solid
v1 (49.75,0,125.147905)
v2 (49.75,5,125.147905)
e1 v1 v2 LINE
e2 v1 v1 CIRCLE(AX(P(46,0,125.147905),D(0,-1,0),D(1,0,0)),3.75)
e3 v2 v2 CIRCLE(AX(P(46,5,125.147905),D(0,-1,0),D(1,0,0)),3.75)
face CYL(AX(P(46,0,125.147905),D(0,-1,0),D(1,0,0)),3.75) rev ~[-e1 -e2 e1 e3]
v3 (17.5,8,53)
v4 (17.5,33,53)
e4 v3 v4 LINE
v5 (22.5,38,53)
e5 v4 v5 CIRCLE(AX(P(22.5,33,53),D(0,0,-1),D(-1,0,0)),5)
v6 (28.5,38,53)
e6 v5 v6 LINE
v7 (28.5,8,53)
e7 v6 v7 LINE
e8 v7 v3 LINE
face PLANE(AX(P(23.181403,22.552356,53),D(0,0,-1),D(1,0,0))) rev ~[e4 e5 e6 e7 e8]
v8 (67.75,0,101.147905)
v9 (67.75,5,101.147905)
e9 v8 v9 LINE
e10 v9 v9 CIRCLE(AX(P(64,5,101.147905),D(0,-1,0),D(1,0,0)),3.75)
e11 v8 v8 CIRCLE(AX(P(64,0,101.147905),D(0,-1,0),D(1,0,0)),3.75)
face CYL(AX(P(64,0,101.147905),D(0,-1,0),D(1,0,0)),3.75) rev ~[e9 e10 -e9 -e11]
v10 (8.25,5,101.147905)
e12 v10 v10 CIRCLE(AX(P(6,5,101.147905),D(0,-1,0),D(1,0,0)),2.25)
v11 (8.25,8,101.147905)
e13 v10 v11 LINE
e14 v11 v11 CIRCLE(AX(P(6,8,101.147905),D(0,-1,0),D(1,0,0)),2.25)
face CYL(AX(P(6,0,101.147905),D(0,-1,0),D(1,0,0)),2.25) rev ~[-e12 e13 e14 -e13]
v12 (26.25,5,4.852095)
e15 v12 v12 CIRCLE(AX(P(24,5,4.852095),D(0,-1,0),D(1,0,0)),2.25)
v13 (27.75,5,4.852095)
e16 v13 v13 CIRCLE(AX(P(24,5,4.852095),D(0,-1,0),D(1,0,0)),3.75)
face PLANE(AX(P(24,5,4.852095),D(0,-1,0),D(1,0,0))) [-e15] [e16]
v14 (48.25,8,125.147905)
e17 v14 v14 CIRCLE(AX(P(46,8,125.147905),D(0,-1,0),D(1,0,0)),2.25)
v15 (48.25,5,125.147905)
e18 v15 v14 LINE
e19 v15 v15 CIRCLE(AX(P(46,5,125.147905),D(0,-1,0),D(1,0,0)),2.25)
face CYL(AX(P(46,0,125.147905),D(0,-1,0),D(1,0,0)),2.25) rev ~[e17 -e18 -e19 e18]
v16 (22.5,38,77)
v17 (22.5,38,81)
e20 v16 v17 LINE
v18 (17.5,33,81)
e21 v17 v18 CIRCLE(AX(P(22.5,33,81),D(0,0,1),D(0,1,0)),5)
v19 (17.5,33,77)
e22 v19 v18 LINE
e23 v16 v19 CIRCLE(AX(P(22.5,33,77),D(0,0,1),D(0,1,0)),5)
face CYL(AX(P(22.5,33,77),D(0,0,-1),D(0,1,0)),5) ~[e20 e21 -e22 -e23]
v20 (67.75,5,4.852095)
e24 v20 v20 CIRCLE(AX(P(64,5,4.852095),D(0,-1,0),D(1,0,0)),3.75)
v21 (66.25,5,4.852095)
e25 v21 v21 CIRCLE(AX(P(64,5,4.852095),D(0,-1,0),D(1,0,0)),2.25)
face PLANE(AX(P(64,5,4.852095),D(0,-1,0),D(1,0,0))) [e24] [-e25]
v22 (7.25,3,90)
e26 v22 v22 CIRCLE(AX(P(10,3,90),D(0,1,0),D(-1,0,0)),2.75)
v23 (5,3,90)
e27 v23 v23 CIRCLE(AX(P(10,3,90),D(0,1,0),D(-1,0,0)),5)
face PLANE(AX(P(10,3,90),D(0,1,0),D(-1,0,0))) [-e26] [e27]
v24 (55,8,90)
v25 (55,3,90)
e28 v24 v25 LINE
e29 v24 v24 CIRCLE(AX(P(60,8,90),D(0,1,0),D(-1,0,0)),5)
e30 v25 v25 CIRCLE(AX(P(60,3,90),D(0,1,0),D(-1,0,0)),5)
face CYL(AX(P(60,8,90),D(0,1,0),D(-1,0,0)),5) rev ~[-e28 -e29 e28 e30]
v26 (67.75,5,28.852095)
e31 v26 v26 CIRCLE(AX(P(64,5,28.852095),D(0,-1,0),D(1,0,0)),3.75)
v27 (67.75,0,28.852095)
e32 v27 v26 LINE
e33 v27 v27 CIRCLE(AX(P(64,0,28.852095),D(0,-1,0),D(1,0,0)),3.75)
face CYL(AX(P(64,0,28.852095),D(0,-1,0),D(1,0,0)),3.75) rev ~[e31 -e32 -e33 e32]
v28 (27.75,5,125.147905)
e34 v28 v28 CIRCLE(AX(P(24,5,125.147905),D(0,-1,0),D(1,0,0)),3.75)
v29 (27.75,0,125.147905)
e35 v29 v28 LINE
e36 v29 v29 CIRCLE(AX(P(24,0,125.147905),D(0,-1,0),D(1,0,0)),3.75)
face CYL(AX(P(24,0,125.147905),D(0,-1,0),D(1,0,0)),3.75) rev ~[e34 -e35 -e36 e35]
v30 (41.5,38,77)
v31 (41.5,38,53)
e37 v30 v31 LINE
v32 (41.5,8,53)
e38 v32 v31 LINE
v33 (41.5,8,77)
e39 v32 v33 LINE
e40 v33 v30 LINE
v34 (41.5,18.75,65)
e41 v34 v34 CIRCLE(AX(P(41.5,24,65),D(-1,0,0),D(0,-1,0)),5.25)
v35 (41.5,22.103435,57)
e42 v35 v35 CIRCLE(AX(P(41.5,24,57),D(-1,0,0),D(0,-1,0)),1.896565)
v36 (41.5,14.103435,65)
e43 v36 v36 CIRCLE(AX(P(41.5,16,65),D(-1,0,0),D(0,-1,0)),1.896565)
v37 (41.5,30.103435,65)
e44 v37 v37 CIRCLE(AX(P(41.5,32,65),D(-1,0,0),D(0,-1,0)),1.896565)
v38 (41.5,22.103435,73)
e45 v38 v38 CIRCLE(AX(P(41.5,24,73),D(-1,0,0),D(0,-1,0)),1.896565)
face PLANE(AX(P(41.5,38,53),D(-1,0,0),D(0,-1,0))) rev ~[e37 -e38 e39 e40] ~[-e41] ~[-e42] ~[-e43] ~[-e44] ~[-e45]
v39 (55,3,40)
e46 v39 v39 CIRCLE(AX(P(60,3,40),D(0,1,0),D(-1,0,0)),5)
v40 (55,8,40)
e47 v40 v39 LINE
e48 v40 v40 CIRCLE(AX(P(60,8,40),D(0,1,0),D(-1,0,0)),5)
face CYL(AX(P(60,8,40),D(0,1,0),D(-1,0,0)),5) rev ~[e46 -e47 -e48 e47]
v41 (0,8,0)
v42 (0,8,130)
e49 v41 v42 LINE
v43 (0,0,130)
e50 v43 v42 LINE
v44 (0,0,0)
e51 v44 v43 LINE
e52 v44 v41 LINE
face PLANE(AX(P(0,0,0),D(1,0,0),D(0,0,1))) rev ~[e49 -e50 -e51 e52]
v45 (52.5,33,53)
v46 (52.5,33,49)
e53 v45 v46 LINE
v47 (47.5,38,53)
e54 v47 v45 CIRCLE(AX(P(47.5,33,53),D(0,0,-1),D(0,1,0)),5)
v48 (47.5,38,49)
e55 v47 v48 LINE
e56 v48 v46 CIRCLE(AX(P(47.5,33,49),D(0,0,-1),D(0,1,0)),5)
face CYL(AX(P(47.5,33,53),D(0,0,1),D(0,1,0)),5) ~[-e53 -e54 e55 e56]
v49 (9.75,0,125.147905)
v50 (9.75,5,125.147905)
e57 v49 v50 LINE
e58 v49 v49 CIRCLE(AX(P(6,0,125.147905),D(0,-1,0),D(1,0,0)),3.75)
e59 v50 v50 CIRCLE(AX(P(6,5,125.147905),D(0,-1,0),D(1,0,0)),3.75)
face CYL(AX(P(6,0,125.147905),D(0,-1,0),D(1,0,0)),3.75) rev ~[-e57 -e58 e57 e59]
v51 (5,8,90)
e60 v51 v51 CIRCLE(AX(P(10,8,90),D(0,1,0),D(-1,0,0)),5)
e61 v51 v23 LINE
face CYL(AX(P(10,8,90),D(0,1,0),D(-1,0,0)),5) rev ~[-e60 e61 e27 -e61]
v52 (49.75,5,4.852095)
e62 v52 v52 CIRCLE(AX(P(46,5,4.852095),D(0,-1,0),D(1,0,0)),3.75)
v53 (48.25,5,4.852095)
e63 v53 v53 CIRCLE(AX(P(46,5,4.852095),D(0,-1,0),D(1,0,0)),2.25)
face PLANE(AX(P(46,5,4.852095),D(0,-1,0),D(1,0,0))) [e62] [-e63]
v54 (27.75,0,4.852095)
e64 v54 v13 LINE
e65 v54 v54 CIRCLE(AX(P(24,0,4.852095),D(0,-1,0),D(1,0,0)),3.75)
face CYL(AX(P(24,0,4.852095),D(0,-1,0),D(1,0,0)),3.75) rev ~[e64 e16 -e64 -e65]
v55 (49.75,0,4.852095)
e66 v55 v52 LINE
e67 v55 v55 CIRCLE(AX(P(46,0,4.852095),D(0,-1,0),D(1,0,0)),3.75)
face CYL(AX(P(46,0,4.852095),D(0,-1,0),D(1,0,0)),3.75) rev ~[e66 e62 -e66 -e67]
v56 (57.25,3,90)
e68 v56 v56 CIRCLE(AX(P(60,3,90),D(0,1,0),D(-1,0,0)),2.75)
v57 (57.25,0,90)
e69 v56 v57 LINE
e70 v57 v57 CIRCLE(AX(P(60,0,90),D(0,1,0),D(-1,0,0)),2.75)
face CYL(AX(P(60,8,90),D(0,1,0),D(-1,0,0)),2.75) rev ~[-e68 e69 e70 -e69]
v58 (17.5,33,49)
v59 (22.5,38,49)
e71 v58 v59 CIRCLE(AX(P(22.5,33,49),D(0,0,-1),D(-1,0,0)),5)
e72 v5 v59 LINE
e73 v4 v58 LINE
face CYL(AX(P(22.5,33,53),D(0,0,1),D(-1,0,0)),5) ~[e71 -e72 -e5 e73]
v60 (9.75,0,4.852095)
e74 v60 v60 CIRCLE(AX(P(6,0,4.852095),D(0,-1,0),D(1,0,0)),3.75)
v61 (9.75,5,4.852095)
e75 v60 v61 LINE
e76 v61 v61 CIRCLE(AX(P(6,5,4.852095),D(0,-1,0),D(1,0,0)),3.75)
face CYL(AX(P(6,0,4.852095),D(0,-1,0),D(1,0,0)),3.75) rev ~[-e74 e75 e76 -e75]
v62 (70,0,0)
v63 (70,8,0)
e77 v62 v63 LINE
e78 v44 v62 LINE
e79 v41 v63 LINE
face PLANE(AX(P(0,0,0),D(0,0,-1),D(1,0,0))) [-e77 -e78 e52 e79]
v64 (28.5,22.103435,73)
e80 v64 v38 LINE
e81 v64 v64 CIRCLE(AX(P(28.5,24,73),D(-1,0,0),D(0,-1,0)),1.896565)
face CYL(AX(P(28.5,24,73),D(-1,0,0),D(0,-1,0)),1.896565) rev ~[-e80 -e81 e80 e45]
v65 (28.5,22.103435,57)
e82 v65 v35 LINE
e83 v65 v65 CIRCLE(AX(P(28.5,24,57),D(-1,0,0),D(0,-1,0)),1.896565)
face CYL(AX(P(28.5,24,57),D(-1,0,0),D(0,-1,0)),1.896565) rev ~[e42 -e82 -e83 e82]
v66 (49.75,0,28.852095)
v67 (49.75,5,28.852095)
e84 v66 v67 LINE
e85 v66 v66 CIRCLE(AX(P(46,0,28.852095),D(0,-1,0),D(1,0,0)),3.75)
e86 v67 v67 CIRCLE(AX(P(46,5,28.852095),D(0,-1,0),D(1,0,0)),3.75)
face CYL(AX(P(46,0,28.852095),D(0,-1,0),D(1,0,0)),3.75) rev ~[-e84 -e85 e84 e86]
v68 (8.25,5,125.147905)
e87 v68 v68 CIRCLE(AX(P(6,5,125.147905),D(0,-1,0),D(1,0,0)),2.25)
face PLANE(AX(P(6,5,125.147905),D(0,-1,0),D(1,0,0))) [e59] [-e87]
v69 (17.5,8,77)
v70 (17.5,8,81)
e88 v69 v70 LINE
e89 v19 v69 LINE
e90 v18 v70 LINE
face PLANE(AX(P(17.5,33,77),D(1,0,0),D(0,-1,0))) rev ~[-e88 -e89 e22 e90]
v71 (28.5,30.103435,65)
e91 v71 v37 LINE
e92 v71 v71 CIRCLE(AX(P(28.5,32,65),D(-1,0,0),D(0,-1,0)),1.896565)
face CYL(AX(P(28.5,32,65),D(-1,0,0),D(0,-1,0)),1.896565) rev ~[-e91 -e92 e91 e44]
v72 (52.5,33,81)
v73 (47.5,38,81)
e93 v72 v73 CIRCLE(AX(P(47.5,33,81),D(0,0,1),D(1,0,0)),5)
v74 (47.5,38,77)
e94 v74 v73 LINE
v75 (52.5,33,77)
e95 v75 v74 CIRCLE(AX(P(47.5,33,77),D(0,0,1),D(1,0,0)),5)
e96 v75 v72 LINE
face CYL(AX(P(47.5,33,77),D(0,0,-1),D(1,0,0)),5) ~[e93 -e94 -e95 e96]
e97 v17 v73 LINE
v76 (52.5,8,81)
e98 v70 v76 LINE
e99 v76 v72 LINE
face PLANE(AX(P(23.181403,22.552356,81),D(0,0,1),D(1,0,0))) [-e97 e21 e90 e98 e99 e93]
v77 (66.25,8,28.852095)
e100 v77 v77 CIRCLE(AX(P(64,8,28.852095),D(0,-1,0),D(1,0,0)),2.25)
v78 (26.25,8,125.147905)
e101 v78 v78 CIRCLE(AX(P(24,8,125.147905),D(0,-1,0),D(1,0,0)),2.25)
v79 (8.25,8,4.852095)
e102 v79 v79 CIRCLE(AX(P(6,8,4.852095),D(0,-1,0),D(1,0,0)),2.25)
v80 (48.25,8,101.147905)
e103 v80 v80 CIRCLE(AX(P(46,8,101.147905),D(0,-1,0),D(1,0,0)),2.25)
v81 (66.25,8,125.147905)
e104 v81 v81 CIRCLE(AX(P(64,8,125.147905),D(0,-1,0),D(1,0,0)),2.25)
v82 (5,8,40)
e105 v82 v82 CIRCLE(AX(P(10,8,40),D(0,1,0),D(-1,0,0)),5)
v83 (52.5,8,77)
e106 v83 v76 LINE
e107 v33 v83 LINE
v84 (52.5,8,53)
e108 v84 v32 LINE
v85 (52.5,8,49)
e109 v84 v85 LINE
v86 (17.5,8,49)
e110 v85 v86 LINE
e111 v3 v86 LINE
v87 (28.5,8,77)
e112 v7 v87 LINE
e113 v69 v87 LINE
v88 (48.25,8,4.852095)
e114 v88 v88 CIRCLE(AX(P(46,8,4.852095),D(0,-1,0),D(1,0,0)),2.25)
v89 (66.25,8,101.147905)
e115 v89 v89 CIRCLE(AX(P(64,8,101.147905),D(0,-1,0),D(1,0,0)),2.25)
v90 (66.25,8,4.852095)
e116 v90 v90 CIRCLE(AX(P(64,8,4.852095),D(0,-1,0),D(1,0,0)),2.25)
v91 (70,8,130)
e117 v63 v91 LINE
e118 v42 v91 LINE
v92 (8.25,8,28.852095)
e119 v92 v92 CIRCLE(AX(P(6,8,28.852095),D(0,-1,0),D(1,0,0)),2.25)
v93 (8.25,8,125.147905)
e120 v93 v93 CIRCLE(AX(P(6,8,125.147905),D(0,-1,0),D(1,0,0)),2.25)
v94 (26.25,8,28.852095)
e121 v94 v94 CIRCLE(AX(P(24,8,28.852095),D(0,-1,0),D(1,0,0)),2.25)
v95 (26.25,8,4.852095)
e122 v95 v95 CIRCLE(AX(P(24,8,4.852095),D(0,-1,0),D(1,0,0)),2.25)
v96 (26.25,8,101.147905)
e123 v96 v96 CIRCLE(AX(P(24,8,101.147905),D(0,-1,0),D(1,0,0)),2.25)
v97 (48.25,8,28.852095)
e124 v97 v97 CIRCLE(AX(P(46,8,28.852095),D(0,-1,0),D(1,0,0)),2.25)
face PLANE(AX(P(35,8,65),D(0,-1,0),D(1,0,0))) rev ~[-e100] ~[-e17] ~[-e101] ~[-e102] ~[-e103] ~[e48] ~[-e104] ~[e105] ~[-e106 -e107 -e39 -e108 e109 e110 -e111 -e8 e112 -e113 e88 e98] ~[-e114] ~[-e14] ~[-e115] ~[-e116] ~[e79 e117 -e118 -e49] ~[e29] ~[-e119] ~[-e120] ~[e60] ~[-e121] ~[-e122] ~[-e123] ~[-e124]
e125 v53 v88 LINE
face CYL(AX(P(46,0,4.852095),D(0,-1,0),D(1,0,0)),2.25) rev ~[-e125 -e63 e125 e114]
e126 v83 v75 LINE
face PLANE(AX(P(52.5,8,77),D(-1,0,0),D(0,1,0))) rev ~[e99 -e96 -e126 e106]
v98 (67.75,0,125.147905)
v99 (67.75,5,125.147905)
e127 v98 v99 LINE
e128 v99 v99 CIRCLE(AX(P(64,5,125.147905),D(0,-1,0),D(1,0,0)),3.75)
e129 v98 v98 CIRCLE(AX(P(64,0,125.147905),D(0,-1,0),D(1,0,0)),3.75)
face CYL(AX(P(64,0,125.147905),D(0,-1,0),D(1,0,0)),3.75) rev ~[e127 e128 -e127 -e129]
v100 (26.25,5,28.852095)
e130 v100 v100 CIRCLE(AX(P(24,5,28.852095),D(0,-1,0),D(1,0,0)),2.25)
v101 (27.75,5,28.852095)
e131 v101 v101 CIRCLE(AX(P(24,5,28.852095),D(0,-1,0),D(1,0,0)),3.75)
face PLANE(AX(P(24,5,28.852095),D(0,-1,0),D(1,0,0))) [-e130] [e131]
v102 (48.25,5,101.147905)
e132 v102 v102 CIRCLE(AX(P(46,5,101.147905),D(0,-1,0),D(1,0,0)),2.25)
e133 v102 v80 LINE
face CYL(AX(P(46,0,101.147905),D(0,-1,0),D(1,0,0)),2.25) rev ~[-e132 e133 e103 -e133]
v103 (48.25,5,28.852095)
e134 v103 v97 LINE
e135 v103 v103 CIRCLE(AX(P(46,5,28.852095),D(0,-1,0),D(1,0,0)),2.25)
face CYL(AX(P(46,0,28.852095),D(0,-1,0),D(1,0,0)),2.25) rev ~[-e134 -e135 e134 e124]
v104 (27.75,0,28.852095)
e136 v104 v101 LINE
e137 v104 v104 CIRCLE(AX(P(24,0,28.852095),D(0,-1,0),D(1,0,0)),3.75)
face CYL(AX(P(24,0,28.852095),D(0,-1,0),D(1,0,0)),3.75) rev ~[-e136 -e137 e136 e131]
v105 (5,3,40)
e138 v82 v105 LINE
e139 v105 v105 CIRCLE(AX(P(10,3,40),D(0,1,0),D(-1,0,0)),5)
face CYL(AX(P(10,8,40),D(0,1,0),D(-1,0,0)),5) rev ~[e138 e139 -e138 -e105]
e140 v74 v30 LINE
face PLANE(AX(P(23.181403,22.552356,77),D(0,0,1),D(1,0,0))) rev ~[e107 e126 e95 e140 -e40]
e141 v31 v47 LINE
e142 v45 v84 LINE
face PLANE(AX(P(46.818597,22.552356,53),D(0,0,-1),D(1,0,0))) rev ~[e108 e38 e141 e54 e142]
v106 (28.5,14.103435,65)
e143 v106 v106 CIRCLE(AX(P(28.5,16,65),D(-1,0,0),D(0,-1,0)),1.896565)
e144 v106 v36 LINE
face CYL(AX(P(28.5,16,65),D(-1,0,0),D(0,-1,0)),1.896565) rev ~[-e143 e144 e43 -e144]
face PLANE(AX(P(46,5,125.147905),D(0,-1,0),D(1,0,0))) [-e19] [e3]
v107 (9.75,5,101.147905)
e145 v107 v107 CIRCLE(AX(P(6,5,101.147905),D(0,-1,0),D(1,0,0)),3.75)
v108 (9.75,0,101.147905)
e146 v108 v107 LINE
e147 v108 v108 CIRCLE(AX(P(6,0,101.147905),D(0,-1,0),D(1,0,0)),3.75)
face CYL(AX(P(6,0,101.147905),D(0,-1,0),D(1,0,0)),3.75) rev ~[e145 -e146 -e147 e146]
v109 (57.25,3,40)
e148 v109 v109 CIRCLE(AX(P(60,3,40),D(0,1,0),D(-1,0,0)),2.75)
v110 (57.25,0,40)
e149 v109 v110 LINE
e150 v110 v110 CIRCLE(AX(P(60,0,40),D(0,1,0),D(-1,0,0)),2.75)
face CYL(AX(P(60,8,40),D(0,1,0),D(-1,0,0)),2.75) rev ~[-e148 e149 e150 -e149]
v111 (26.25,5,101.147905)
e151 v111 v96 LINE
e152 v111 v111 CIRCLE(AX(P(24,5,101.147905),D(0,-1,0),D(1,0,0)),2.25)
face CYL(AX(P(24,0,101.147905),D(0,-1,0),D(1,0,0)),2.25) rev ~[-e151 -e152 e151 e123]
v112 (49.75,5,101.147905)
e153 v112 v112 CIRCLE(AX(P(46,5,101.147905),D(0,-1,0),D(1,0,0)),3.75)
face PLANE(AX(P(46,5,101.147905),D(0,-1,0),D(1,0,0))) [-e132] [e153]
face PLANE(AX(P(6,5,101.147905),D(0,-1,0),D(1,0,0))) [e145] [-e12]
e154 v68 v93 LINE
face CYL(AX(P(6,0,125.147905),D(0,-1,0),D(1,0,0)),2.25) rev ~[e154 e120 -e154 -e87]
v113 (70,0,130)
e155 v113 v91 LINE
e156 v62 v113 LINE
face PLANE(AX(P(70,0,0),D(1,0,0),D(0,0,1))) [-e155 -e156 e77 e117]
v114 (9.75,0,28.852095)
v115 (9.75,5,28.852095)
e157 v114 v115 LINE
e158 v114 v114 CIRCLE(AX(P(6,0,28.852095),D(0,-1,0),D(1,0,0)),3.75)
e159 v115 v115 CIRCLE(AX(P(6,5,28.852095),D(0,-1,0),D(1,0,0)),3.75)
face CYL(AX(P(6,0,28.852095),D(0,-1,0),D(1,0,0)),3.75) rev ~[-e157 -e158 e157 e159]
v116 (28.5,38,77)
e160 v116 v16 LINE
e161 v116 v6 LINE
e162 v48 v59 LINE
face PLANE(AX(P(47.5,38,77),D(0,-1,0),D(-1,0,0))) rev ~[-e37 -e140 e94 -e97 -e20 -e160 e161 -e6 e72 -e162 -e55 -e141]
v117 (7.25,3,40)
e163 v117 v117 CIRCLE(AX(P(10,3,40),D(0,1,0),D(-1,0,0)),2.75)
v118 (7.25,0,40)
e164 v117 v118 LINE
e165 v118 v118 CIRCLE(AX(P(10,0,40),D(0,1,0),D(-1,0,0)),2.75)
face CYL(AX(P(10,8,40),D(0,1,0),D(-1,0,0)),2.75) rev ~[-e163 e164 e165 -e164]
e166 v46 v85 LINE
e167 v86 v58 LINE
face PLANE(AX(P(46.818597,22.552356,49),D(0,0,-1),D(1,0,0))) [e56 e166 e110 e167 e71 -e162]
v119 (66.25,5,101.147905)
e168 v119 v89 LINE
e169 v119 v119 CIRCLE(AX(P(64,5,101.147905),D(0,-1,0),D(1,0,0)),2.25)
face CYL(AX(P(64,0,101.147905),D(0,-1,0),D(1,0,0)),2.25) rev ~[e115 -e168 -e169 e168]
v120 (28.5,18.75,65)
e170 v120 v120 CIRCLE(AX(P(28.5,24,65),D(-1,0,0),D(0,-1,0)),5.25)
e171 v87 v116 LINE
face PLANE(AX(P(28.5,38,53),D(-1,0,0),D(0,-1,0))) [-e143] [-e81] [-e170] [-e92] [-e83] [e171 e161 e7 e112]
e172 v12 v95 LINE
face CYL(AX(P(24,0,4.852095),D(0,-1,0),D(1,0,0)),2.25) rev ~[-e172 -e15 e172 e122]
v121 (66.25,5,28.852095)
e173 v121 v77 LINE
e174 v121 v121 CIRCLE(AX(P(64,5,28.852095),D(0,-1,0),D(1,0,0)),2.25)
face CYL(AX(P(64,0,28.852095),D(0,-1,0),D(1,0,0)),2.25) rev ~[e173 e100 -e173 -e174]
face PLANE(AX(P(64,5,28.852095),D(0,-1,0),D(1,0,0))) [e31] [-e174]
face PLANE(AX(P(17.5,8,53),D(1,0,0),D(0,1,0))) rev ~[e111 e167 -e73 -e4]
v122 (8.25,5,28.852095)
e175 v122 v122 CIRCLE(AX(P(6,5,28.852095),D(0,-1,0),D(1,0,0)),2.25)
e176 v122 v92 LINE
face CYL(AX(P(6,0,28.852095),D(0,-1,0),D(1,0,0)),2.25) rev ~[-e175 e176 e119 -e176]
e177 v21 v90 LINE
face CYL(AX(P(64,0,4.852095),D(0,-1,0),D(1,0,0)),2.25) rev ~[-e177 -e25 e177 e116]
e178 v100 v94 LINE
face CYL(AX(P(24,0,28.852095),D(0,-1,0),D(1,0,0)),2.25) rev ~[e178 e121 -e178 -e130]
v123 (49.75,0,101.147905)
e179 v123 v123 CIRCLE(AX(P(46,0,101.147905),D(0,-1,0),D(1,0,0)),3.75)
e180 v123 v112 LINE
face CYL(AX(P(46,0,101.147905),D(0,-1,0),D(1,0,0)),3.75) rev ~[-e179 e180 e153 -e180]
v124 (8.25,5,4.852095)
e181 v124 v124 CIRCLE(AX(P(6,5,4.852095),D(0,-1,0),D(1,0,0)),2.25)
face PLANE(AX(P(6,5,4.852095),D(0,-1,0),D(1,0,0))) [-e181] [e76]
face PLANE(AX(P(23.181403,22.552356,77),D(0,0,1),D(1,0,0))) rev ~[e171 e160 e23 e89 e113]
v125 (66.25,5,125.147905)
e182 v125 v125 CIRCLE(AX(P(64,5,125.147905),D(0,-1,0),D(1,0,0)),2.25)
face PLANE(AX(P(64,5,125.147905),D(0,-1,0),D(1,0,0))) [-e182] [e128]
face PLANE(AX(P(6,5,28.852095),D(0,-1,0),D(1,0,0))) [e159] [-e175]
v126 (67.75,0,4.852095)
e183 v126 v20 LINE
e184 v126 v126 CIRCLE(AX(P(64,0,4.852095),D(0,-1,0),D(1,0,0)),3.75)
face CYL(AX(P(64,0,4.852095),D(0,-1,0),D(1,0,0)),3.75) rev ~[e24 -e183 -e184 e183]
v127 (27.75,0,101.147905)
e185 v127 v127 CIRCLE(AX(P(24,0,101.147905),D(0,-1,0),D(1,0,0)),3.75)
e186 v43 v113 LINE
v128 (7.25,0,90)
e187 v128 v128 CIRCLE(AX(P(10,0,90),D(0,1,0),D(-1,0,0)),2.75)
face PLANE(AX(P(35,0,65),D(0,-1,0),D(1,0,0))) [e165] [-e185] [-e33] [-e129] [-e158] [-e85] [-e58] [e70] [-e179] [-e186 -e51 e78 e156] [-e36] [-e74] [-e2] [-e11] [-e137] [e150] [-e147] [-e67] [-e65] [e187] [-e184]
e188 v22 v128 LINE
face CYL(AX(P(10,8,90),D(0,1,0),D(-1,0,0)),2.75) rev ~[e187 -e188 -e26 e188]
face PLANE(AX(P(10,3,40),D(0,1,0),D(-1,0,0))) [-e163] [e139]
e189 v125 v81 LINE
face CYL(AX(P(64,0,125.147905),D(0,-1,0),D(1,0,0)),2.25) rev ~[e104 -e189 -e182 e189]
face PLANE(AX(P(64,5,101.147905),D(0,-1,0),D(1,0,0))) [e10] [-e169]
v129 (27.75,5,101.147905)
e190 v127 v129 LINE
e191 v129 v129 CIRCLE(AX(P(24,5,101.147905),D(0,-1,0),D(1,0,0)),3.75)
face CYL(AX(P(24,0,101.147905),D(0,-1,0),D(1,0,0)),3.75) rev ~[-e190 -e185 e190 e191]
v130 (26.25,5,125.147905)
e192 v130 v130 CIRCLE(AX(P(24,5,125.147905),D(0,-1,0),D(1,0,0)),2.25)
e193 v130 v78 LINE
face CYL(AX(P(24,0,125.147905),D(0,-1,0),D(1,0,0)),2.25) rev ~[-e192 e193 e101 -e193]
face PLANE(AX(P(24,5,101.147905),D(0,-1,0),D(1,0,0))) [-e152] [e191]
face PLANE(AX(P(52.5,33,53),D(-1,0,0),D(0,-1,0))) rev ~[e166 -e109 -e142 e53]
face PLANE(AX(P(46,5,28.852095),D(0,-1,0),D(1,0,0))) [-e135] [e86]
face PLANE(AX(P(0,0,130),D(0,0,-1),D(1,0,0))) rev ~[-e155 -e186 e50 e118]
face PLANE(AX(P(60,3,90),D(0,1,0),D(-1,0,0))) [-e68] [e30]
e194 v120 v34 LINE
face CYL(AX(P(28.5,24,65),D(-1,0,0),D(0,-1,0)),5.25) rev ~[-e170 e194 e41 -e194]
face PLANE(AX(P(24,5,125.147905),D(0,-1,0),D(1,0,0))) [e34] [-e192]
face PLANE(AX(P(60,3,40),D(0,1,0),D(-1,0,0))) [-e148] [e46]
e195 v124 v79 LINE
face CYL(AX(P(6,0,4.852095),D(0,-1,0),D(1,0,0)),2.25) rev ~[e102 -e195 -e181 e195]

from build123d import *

# Parameters (mm, degrees)
F0_W      = 70
F0_H      = 130
F0_R      = 2.25
F1_DEPTH  = 8
F3_W      = 13
F3_H      = 24
F4_DEPTH  = 30
F5_R      = 1.8965654334
F5_R_2    = 5.25
F6_DEPTH  = 41.501
F7_R      = 2.75
F8_DEPTH  = 8.001
F9_R      = 5
F9_R_2    = 2.75
F10_DEPTH = 5
F11_W     = 13
F11_H     = 30
F12_DEPTH = 4
F13_W     = 13
F13_H     = 30
F14_DEPTH = 4
F15_R     = 3.75
F15_R_2   = 2.25
F16_DEPTH = 5
F17_DEPTH = 4
F18_DEPTH = 4


# Not quite as in the source:
# - a feature names something its author has since deleted; it is built from what else it names


with BuildPart() as f1:
    # F0 (on Front) → F1 (new body)
    with BuildSketch(Plane.XZ):
        with Locations((35, 65)):
            Rectangle(F0_W, F0_H)
        with Locations((6, 4.8520950079)):
            Circle(F0_R, mode=Mode.SUBTRACT)
        with Locations((6, 28.8520950079)):
            Circle(F0_R, mode=Mode.SUBTRACT)
        with Locations((24, 4.8520950079)):
            Circle(F0_R, mode=Mode.SUBTRACT)
        with Locations((24, 28.8520950079)):
            Circle(F0_R, mode=Mode.SUBTRACT)
        with Locations((46, 4.8520950079)):
            Circle(F0_R, mode=Mode.SUBTRACT)
        with Locations((46, 28.8520950079)):
            Circle(F0_R, mode=Mode.SUBTRACT)
        with Locations((64, 4.8520950079)):
            Circle(F0_R, mode=Mode.SUBTRACT)
        with Locations((64, 28.8520950079)):
            Circle(F0_R, mode=Mode.SUBTRACT)
        with Locations((6, 101.1479049921)):
            Circle(F0_R, mode=Mode.SUBTRACT)
        with Locations((6, 125.1479049921)):
            Circle(F0_R, mode=Mode.SUBTRACT)
        with Locations((24, 101.1479049921)):
            Circle(F0_R, mode=Mode.SUBTRACT)
        with Locations((24, 125.1479049921)):
            Circle(F0_R, mode=Mode.SUBTRACT)
        with Locations((46, 101.1479049921)):
            Circle(F0_R, mode=Mode.SUBTRACT)
        with Locations((46, 125.1479049921)):
            Circle(F0_R, mode=Mode.SUBTRACT)
        with Locations((64, 101.1479049921)):
            Circle(F0_R, mode=Mode.SUBTRACT)
        with Locations((64, 125.1479049921)):
            Circle(F0_R, mode=Mode.SUBTRACT)
    extrude(amount=-F1_DEPTH)

    # F3 (on face) → F4 (join)
    with BuildSketch(Plane(origin=(0, 8, 0), x_dir=(-1, 0, 0), z_dir=(0, 1, 0))):
        with Locations((-35, 65)):
            Rectangle(F3_W, F3_H)
    extrude(amount=F4_DEPTH)

    # F5 (on face) → F6 (cut, through all)
    with BuildSketch(Plane(origin=(28.5, 0, 0), x_dir=(0, -1, 0), z_dir=(-1, 0, 0))):
        with Locations((-32, 65)):
            Circle(F5_R)
        with Locations((-24, 73)):
            Circle(F5_R)
        with Locations((-16, 65)):
            Circle(F5_R)
        with Locations((-24, 57)):
            Circle(F5_R)
        with Locations((-24, 65)):
            Circle(F5_R_2)
    extrude(amount=-F6_DEPTH, mode=Mode.SUBTRACT)

    # F7 (on face) → F8 (cut, through all)
    with BuildSketch(Plane(origin=(0, 8, 0), x_dir=(-1, 0, 0), z_dir=(0, 1, 0))):
        with Locations((-60, 90)):
            Circle(F7_R)
        with Locations((-10, 90)):
            Circle(F7_R)
        with Locations((-60, 40)):
            Circle(F7_R)
        with Locations((-10, 40)):
            Circle(F7_R)
    extrude(amount=-F8_DEPTH, mode=Mode.SUBTRACT)

    # F9 (on face) → F10 (cut)
    with BuildSketch(Plane(origin=(0, 8, 0), x_dir=(-1, 0, 0), z_dir=(0, 1, 0))):
        with Locations((-60, 90)):
            Circle(F9_R)
        with Locations((-60, 90)):
            Circle(F9_R_2, mode=Mode.SUBTRACT)
        with Locations((-10, 90)):
            Circle(F9_R)
        with Locations((-10, 90)):
            Circle(F9_R_2, mode=Mode.SUBTRACT)
        with Locations((-10, 40)):
            Circle(F9_R)
        with Locations((-10, 40)):
            Circle(F9_R_2, mode=Mode.SUBTRACT)
        with Locations((-60, 40)):
            Circle(F9_R)
        with Locations((-60, 40)):
            Circle(F9_R_2, mode=Mode.SUBTRACT)
    extrude(amount=-F10_DEPTH, mode=Mode.SUBTRACT)

    # F11 (on face) → F12 (join)
    with BuildSketch(Plane.XY.offset(77)):
        with Locations((35, 23)):
            Rectangle(F11_W, F11_H)
    extrude(amount=F12_DEPTH)

    # F13 (on face) → F14 (join)
    with BuildSketch(Plane(origin=(0, 0, 53), x_dir=(1, 0, 0), z_dir=(0, 0, -1))):
        with Locations((35, -23)):
            Rectangle(F13_W, F13_H)
    extrude(amount=F14_DEPTH)

    # F15 (on face) → F16 (cut)
    with BuildSketch(Plane.XZ):
        with Locations((6, 125.1479049921)):
            Circle(F15_R)
        with Locations((6, 125.1479049921)):
            Circle(F15_R_2, mode=Mode.SUBTRACT)
        with Locations((24, 101.1479049921)):
            Circle(F15_R)
        with Locations((24, 101.1479049921)):
            Circle(F15_R_2, mode=Mode.SUBTRACT)
        with Locations((24, 125.1479049921)):
            Circle(F15_R)
        with Locations((24, 125.1479049921)):
            Circle(F15_R_2, mode=Mode.SUBTRACT)
        with Locations((6, 101.1479049921)):
            Circle(F15_R)
        with Locations((6, 101.1479049921)):
            Circle(F15_R_2, mode=Mode.SUBTRACT)
        with Locations((46, 125.1479049921)):
            Circle(F15_R)
        with Locations((46, 125.1479049921)):
            Circle(F15_R_2, mode=Mode.SUBTRACT)
        with Locations((64, 125.1479049921)):
            Circle(F15_R)
        with Locations((64, 125.1479049921)):
            Circle(F15_R_2, mode=Mode.SUBTRACT)
        with Locations((46, 101.1479049921)):
            Circle(F15_R)
        with Locations((46, 101.1479049921)):
            Circle(F15_R_2, mode=Mode.SUBTRACT)
        with Locations((64, 101.1479049921)):
            Circle(F15_R)
        with Locations((64, 101.1479049921)):
            Circle(F15_R_2, mode=Mode.SUBTRACT)
        with Locations((6, 28.8520950079)):
            Circle(F15_R)
        with Locations((6, 28.8520950079)):
            Circle(F15_R_2, mode=Mode.SUBTRACT)
        with Locations((24, 28.8520950079)):
            Circle(F15_R)
        with Locations((24, 28.8520950079)):
            Circle(F15_R_2, mode=Mode.SUBTRACT)
        with Locations((46, 28.8520950079)):
            Circle(F15_R)
        with Locations((46, 28.8520950079)):
            Circle(F15_R_2, mode=Mode.SUBTRACT)
        with Locations((6, 4.8520950079)):
            Circle(F15_R)
        with Locations((6, 4.8520950079)):
            Circle(F15_R_2, mode=Mode.SUBTRACT)
        with Locations((64, 28.8520950079)):
            Circle(F15_R)
        with Locations((64, 28.8520950079)):
            Circle(F15_R_2, mode=Mode.SUBTRACT)
        with Locations((24, 4.8520950079)):
            Circle(F15_R)
        with Locations((24, 4.8520950079)):
            Circle(F15_R_2, mode=Mode.SUBTRACT)
        with Locations((46, 4.8520950079)):
            Circle(F15_R)
        with Locations((46, 4.8520950079)):
            Circle(F15_R_2, mode=Mode.SUBTRACT)
        with Locations((64, 4.8520950079)):
            Circle(F15_R)
        with Locations((64, 4.8520950079)):
            Circle(F15_R_2, mode=Mode.SUBTRACT)
    extrude(amount=-F16_DEPTH, mode=Mode.SUBTRACT)

    # F13 (on face) → F17 (join)
    with BuildSketch(Plane(origin=(0, 0, 53), x_dir=(1, 0, 0), z_dir=(0, 0, -1))):
        with BuildLine():
            Line((52.5, -8), (52.4993246093, -8))
            Line((52.4993246093, -8), (41.5, -8))
            Line((41.5, -8), (41.5, -38))
            Line((41.5, -38), (47.5, -38))
            ThreePointArc((47.5, -38), (51.0355339059, -36.5355339059), (52.5, -33))
            Line((52.5, -33), (52.5, -8))
        make_face()
        with BuildLine():
            Line((28.5, -38), (28.5, -8))
            Line((28.5, -8), (17.5, -8))
            Line((17.5, -8), (17.5, -33))
            ThreePointArc((17.5, -33), (18.9644660941, -36.5355339059), (22.5, -38))
            Line((22.5, -38), (28.5, -38))
        make_face()
    extrude(amount=F17_DEPTH)

    # F11 (on face) → F18 (join)
    with BuildSketch(Plane.XY.offset(77)):
        with BuildLine():
            Line((28.5, 8), (28.5, 38))
            Line((28.5, 38), (22.5, 38))
            ThreePointArc((22.5, 38), (18.9644660941, 36.5355339059), (17.5, 33))
            Line((17.5, 33), (17.5, 8))
            Line((17.5, 8), (28.5, 8))
        make_face()
        with BuildLine():
            Line((47.5, 38), (41.5, 38))
            Line((41.5, 38), (41.5, 8))
            Line((41.5, 8), (52.5, 8))
            Line((52.5, 8), (52.5, 33))
            ThreePointArc((52.5, 33), (51.0355339059, 36.5355339059), (47.5, 38))
        make_face()
        with Locations((35, 23)):
            Rectangle(F11_W, F11_H)
    extrude(amount=F18_DEPTH)


solid = f1.part
